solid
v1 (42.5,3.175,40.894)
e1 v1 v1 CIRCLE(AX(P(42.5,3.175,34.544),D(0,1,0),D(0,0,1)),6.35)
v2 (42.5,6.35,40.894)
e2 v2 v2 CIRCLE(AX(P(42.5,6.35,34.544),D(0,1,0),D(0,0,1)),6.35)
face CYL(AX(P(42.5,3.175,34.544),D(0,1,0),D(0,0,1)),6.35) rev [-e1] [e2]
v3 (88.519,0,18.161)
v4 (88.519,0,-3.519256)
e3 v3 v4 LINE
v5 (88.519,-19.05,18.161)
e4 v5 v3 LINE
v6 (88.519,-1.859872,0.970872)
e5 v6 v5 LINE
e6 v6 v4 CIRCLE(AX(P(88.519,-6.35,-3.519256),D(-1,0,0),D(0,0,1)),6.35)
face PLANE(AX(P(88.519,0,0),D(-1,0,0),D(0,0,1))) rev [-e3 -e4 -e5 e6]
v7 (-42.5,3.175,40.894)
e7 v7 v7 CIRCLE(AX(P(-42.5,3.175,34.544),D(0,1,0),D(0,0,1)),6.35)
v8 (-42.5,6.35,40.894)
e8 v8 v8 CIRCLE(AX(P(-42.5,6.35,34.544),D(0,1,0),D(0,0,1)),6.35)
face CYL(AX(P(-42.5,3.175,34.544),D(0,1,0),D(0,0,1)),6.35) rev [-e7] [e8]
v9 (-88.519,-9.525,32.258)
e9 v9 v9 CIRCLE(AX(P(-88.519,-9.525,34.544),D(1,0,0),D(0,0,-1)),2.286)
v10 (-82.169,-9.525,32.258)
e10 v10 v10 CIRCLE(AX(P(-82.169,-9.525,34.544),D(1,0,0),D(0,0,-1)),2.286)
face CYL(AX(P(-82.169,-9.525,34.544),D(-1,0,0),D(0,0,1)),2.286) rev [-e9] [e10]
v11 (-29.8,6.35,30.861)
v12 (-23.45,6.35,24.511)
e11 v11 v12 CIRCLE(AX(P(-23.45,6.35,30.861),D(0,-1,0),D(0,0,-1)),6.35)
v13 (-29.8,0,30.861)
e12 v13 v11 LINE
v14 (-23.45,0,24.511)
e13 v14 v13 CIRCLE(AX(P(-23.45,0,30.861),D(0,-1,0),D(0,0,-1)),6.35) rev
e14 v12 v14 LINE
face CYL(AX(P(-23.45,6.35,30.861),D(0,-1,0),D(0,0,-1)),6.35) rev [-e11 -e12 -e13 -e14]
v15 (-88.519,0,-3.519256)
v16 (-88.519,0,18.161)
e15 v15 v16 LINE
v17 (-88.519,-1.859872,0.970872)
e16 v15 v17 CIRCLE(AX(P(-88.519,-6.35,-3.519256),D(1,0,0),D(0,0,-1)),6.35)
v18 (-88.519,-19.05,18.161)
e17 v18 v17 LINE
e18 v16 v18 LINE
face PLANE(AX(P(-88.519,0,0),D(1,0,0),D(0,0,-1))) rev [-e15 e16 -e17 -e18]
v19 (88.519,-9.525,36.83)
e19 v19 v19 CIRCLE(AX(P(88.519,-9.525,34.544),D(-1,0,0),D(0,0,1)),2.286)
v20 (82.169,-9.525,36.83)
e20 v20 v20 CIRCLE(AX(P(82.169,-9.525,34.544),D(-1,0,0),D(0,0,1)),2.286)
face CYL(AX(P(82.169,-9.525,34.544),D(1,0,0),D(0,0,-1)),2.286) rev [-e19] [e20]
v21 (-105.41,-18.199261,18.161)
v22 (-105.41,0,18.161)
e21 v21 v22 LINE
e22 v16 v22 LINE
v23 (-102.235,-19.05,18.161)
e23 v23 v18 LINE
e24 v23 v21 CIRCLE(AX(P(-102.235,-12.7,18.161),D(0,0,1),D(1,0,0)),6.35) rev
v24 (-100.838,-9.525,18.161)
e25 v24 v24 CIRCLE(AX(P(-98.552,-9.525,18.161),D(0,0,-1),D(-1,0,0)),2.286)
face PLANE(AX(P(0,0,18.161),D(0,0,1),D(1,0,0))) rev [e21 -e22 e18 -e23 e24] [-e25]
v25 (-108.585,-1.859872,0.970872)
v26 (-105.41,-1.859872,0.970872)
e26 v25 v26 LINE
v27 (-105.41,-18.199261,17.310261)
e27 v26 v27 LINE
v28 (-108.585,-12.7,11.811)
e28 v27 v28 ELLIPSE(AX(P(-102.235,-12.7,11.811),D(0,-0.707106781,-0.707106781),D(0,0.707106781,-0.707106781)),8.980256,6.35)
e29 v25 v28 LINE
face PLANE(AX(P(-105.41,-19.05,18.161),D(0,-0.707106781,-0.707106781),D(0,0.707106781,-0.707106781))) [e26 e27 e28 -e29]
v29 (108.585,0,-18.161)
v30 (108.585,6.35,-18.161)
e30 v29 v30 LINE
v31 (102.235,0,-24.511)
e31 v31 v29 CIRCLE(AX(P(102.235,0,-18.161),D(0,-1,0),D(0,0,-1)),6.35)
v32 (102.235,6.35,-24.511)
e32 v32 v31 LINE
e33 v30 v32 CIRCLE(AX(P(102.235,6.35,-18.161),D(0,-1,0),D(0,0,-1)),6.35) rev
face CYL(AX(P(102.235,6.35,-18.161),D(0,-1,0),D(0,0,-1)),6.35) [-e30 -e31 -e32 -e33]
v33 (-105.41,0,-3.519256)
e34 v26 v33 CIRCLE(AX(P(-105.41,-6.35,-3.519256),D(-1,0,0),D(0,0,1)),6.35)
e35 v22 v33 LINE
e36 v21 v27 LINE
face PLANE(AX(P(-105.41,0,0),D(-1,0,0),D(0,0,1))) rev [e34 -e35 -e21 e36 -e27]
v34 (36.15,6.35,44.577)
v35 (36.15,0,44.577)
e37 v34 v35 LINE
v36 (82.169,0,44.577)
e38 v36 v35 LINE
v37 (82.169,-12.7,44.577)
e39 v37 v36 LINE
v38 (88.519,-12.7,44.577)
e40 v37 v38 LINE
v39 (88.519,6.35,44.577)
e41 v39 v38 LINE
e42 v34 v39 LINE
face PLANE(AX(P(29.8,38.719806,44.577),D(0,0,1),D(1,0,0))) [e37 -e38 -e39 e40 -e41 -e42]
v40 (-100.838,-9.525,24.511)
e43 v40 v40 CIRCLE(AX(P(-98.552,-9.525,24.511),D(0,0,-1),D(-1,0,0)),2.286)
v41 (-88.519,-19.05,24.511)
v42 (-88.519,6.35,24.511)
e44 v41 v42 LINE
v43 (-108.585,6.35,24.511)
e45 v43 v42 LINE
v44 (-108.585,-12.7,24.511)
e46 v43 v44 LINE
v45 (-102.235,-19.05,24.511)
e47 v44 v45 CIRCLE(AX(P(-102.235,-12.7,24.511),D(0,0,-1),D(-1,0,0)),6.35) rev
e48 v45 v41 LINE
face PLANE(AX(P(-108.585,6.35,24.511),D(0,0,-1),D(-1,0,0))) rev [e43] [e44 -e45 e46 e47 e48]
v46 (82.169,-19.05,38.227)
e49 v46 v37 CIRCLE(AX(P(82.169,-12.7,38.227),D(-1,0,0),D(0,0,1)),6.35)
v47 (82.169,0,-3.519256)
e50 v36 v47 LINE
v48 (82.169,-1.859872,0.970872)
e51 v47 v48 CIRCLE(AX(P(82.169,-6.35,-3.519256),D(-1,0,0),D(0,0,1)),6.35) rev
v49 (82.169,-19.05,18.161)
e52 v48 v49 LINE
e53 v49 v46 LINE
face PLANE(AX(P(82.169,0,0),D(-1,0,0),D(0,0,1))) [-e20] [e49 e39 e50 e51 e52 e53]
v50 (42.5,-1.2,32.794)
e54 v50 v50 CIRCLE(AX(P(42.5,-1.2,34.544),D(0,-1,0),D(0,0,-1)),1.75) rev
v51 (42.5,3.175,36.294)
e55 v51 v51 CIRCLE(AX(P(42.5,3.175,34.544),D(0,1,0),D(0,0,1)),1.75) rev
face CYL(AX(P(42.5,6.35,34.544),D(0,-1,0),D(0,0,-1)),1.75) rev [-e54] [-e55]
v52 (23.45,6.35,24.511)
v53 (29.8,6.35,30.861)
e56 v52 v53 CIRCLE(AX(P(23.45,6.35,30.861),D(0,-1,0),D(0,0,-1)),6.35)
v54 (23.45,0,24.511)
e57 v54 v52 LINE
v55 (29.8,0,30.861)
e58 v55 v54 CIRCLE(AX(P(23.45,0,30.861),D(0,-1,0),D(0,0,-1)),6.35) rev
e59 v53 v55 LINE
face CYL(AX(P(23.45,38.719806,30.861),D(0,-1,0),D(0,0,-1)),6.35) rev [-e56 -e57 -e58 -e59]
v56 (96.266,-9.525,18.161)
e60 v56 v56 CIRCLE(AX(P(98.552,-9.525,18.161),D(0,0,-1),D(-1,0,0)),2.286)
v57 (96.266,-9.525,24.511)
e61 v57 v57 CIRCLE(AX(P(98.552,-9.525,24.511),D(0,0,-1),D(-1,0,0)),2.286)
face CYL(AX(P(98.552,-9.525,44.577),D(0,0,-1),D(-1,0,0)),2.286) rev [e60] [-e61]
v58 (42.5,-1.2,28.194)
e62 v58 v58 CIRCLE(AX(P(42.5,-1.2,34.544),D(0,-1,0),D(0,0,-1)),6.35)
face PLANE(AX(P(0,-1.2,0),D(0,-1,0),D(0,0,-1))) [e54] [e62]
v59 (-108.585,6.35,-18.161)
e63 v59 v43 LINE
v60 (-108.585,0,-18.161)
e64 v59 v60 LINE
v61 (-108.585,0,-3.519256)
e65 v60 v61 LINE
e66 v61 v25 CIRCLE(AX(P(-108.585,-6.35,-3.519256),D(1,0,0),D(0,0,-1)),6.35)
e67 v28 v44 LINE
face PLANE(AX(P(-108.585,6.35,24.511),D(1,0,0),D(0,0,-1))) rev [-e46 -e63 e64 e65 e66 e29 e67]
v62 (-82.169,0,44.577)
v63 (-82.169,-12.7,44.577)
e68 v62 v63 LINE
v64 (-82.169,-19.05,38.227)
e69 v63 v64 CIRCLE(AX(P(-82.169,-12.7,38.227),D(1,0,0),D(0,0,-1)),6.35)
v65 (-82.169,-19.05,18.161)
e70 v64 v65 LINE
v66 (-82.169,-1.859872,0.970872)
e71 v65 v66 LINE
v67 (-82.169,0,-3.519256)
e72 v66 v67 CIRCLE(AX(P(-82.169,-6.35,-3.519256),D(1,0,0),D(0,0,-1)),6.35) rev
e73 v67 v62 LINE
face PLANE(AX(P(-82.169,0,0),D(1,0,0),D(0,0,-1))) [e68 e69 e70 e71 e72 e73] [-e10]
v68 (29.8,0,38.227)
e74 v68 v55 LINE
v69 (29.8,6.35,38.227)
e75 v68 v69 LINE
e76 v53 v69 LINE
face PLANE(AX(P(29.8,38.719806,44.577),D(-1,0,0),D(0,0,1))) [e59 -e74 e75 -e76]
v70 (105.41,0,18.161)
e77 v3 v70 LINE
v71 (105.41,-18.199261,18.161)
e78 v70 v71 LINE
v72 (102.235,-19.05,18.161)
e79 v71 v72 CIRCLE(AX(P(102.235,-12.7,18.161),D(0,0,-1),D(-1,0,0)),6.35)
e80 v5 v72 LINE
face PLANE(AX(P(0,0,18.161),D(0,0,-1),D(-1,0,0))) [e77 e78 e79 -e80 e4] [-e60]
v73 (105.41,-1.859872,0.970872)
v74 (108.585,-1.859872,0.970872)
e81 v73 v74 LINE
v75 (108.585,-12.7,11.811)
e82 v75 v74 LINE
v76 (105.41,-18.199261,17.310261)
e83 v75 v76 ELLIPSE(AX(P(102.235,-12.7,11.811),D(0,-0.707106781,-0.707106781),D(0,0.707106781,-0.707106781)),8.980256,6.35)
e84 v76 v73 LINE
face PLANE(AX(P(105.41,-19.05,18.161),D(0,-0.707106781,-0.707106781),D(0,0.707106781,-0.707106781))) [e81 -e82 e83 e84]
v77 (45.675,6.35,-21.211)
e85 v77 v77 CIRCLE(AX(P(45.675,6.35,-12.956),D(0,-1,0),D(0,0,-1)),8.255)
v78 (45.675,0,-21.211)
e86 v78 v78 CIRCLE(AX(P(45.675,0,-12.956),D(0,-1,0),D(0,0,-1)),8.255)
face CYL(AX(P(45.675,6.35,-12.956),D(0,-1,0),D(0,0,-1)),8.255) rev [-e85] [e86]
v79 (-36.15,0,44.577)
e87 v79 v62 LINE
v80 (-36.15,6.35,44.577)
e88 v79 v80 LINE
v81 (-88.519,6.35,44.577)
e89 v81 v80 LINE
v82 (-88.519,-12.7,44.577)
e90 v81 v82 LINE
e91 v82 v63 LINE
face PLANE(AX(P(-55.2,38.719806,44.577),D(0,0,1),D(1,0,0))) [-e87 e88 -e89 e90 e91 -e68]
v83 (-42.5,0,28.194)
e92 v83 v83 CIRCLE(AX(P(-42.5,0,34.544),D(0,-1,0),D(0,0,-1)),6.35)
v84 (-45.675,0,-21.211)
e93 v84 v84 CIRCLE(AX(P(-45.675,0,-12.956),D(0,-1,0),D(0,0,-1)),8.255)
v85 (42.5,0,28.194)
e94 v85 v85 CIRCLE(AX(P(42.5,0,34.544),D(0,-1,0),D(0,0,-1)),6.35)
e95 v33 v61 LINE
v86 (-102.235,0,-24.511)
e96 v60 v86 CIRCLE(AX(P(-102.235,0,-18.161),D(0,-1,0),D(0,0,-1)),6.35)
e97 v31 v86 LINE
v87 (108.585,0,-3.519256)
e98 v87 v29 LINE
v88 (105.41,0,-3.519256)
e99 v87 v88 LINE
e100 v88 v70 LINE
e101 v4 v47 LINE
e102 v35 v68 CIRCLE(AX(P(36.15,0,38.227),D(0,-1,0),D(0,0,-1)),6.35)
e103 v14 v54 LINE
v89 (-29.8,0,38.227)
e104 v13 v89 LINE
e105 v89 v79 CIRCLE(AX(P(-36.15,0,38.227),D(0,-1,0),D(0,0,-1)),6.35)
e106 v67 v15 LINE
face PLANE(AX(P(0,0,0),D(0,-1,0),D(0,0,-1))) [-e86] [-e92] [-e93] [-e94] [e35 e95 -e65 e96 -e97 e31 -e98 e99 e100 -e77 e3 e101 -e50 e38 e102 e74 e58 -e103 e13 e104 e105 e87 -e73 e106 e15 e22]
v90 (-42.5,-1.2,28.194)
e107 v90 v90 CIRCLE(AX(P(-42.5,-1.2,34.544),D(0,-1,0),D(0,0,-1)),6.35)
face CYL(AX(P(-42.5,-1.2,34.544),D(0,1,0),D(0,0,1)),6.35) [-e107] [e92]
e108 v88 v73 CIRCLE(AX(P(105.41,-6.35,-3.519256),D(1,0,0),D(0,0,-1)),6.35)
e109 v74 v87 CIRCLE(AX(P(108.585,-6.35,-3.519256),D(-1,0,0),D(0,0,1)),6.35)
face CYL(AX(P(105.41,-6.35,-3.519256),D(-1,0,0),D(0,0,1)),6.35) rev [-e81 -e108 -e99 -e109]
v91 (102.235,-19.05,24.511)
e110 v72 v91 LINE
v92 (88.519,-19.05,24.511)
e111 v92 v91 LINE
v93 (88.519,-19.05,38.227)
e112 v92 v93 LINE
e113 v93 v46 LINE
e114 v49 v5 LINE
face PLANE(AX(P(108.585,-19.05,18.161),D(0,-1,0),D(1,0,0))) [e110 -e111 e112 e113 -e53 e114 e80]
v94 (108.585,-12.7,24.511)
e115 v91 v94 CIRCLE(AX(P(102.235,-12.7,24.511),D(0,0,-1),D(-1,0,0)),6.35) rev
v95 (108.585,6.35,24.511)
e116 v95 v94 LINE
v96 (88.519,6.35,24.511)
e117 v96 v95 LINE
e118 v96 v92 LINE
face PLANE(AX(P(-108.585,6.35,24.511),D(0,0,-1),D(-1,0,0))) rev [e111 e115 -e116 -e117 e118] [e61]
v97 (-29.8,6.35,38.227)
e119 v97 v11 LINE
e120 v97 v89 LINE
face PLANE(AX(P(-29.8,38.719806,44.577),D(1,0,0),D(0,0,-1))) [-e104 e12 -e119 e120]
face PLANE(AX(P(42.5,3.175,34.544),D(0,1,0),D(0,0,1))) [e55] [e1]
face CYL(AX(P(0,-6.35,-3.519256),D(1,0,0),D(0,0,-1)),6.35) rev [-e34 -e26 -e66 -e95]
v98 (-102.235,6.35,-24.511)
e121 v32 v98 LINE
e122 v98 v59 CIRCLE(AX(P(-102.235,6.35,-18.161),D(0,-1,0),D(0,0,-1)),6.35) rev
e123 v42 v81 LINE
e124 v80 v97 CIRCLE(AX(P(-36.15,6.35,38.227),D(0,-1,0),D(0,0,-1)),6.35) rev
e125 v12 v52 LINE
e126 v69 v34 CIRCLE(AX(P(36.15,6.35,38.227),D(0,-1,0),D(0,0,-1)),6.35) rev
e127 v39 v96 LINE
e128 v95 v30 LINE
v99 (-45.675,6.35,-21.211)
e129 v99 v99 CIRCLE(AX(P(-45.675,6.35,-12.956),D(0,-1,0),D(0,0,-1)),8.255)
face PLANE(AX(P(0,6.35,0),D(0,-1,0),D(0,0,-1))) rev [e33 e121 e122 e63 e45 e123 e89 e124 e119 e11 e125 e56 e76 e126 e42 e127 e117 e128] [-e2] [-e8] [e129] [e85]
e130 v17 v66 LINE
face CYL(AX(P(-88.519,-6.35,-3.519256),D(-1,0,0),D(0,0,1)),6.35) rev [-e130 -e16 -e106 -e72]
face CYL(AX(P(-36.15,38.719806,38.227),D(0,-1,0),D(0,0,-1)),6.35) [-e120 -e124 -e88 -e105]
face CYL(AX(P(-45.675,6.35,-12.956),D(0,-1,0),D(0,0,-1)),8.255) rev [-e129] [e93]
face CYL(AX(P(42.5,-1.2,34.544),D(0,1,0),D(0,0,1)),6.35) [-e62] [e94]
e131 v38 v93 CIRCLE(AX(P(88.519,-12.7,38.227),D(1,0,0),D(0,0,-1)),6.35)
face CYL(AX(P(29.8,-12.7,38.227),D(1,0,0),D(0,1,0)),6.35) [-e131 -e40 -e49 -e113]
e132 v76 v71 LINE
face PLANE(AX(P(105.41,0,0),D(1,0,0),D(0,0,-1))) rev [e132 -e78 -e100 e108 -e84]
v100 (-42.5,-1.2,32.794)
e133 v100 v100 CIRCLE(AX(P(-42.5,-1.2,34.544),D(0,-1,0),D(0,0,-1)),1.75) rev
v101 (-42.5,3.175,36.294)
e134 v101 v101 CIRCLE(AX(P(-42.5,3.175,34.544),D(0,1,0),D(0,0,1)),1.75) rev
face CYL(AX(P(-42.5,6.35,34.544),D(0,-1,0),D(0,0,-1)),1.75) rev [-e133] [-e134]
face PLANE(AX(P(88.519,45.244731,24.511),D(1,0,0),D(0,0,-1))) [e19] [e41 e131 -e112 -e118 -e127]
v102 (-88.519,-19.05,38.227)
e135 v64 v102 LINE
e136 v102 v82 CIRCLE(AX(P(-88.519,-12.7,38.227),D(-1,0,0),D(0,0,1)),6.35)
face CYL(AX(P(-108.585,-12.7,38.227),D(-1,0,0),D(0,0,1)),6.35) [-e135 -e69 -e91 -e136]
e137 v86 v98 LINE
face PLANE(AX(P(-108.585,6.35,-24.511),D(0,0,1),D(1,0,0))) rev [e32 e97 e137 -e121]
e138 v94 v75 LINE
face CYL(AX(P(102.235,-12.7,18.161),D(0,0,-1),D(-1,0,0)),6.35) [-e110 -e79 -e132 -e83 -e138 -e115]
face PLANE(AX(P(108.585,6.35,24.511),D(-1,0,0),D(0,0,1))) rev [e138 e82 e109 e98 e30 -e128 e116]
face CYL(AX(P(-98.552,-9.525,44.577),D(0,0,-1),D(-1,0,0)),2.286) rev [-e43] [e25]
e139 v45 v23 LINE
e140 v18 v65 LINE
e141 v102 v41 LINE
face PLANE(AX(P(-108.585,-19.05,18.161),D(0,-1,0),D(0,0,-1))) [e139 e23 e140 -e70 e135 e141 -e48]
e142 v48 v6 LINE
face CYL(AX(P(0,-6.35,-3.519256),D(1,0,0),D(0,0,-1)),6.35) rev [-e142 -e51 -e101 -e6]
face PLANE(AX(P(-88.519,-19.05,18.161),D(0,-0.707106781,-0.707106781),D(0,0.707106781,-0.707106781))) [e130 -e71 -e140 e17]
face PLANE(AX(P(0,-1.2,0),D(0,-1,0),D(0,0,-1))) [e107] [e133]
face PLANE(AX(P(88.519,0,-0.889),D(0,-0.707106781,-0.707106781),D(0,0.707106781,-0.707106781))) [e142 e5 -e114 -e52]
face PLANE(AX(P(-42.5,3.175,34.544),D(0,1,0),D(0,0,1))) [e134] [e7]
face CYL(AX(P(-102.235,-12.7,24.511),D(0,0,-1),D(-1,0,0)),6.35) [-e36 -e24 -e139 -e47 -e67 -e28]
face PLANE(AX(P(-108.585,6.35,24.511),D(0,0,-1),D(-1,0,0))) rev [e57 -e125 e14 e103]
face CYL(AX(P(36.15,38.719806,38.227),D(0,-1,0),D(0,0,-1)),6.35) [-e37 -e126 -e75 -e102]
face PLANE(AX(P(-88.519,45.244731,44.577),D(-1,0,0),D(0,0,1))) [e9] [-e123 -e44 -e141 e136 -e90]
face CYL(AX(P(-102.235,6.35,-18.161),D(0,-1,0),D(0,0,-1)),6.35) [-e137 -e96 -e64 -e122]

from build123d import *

# Parameters (mm, degrees)
SKETCH1_W            = 217.17
SKETCH1_H            = 49.022
BOSS_EXTRUDE1_DEPTH  = 6.35
SKETCH5_W            = 20.066
SKETCH5_H            = 25.4
BOSS_EXTRUDE3_DEPTH  = 6.35
SKETCH6_W            = 25.4
SKETCH6_H            = 20.066
BOSS_EXTRUDE4_DEPTH  = 6.35
SKETCH7_R            = 1.75
CUT_EXTRUDE1_DEPTH   = 119.914732704
SKETCH9_R            = 2.286
CUT_EXTRUDE2_DEPTH   = 119.213807607
BOSS_EXTRUDE8_DEPTH  = 3.175
BOSS_EXTRUDE9_START  = 1.2
SKETCH15_R           = 6.35
SKETCH15_R_2         = 1.75
BOSS_EXTRUDE9_DEPTH  = 1.2
CUT_EXTRUDE4_START   = -3.175
SKETCH16_R           = 6.35
CUT_EXTRUDE4_DEPTH   = 3.175
SKETCH17_R           = 8.255
CUT_EXTRUDE5_DEPTH   = 119.914732704
SKETCH18_W           = 33.319
SKETCH18_H           = 20.066
BOSS_EXTRUDE10_DEPTH = 6.35
SKETCH19_R           = 2.286
BOSS_EXTRUDE11_DEPTH = 6.35
BOSS_EXTRUDE12_START = 6.35
SKETCH20_W           = 26.416
SKETCH20_H           = 19.05
SKETCH20_R           = 2.286
BOSS_EXTRUDE12_DEPTH = 6.35
BOSS_EXTRUDE13_DEPTH = 3.175
BOSS_EXTRUDE14_DEPTH = 3.175
BOSS_EXTRUDE15_DEPTH = 6.35
BOSS_EXTRUDE16_DEPTH = 6.35
FILLET2_R            = 6.35
FILLET3_R            = 6.35


with BuildPart() as part:
    # Sketch1 → Boss-Extrude1 (new body)
    with BuildSketch(Plane(origin=(0, 0, 0), x_dir=(1, 0, 0), z_dir=(0, 1, 0))):
        Rectangle(SKETCH1_W, SKETCH1_H)
    extrude(amount=BOSS_EXTRUDE1_DEPTH)

    # Sketch5 → Boss-Extrude3 (add)
    with BuildSketch(Plane.XY.offset(24.511)):
        with Locations((-98.552, -6.35)):
            Rectangle(SKETCH5_W, SKETCH5_H)
        with Locations((98.552, -6.35)):
            Rectangle(SKETCH5_W, SKETCH5_H)
    extrude(amount=-BOSS_EXTRUDE3_DEPTH)

    # Sketch6 → Boss-Extrude4 (add)
    with BuildSketch(Plane(origin=(0, 0, 0), x_dir=(-1, 0, 0), z_dir=(0, -1, 0))):
        with Locations((42.5, -34.544)):
            Rectangle(SKETCH6_W, SKETCH6_H)
        with Locations((-42.5, -34.544)):
            Rectangle(SKETCH6_W, SKETCH6_H)
    extrude(amount=-BOSS_EXTRUDE4_DEPTH)

    # Sketch7 → Cut-Extrude1 (cut, through all)
    with BuildSketch(Plane.XZ):
        with Locations(Location((-42.5, 34.544, 0), (0, 0, 270))):
            Circle(SKETCH7_R)
        with Locations(Location((42.5, 34.544, 0), (0, 0, 270))):
            Circle(SKETCH7_R)
    extrude(amount=-CUT_EXTRUDE1_DEPTH, mode=Mode.SUBTRACT)

    # Sketch9 → Cut-Extrude2 (cut, through all)
    with BuildSketch(Plane(origin=(0, 0, 18.161), x_dir=(-1, 0, 0), z_dir=(0, 0, -1))):
        with Locations((98.552, -9.525)):
            Circle(SKETCH9_R)
        with Locations((-98.552, -9.525)):
            Circle(SKETCH9_R)
    extrude(amount=-CUT_EXTRUDE2_DEPTH, mode=Mode.SUBTRACT)

    # Sketch14 → Boss-Extrude8 (add)
    with BuildSketch(Plane.ZY.offset(108.585)):
        Polygon((-24.511, 6.35), (-24.511, 0), (18.161, 0), (18.161, -19.05), (24.511, -19.05), (24.511, 6.35), align=None)
    extrude(amount=-BOSS_EXTRUDE8_DEPTH)

    # Sketch15 → Boss-Extrude9 (add)
    # profile 1 of 2: a face of its own
    with BuildSketch(Plane.XZ.offset(BOSS_EXTRUDE9_START)):
        with Locations(Location((42.5, 34.544, 0), (0, 0, 270))):
            Circle(SKETCH15_R)
        with Locations(Location((42.5, 34.544, 0), (0, 0, 270))):
            Circle(SKETCH15_R_2, mode=Mode.SUBTRACT)
    # profile 2 of 2: a face of its own
    with BuildSketch(Plane.XZ.offset(BOSS_EXTRUDE9_START)):
        with Locations(Location((-42.5, 34.544, 0), (0, 0, 270))):
            Circle(SKETCH15_R)
        with Locations(Location((-42.5, 34.544, 0), (0, 0, 270))):
            Circle(SKETCH15_R_2, mode=Mode.SUBTRACT)
    extrude(amount=-BOSS_EXTRUDE9_DEPTH)

    # Sketch16 → Cut-Extrude4 (cut)
    with BuildSketch(Plane(origin=(0, 6.35, 0), x_dir=(1, 0, 0), z_dir=(0, 1, 0)).offset(CUT_EXTRUDE4_START)):
        with Locations(Location((42.5, -34.544, 0), (0, 0, 90))):
            Circle(SKETCH16_R)
        with Locations(Location((-42.5, -34.544, 0), (0, 0, 90))):
            Circle(SKETCH16_R)
    extrude(amount=CUT_EXTRUDE4_DEPTH, mode=Mode.SUBTRACT)

    # Sketch17 → Cut-Extrude5 (cut, through all)
    with BuildSketch(Plane.XZ):
        with Locations(Location((-45.675, -12.956, 0), (0, 0, 270))):
            Circle(SKETCH17_R)
        with Locations(Location((45.675, -12.956, 0), (0, 0, 270))):
            Circle(SKETCH17_R)
    extrude(amount=-CUT_EXTRUDE5_DEPTH, mode=Mode.SUBTRACT)

    # Sketch18 → Boss-Extrude10 (add)
    with BuildSketch(Plane.XZ):
        with Locations((71.8595, 34.544)):
            Rectangle(SKETCH18_W, SKETCH18_H)
        with Locations((-71.8595, 34.544)):
            Rectangle(SKETCH18_W, SKETCH18_H)
    extrude(amount=-BOSS_EXTRUDE10_DEPTH)

    # Sketch19 → Boss-Extrude11 (add)
    with BuildSketch(Plane.ZY.offset(-88.519)):
        Polygon((24.511, -19.05), (44.577, -19.05), (44.577, 0), (24.511, 0), (18.161, 0), (18.161, -19.05), align=None)
        with Locations((34.544, -9.525)):
            Circle(SKETCH19_R, mode=Mode.SUBTRACT)
    extrude(amount=BOSS_EXTRUDE11_DEPTH)

    # Sketch20 → Boss-Extrude12 (add)
    with BuildSketch(Plane(origin=(-88.519, 0, 0), x_dir=(0, 0, -1), z_dir=(1, 0, 0)).offset(BOSS_EXTRUDE12_START)):
        with Locations((-31.369, -9.525)):
            Rectangle(SKETCH20_W, SKETCH20_H)
        with Locations(Location((-34.544, -9.525, 0), (0, 0, 180))):
            Circle(SKETCH20_R, mode=Mode.SUBTRACT)
    extrude(amount=-BOSS_EXTRUDE12_DEPTH)

    # Sketch21 → Boss-Extrude13 (add)
    with BuildSketch(Plane.ZY.offset(108.585)):
        Polygon((18.161, -19.05), (-0.889, 0), (18.161, 0), align=None)
    extrude(amount=-BOSS_EXTRUDE13_DEPTH)

    # Sketch22 → Boss-Extrude14 (add)
    with BuildSketch(Plane(origin=(108.585, 0, 0), x_dir=(0, 0, -1), z_dir=(1, 0, 0))):
        Polygon((-18.161, 0), (-18.161, -19.05), (0.889, 0), align=None)
    extrude(amount=-BOSS_EXTRUDE14_DEPTH)

    # Sketch23 → Boss-Extrude15 (add)
    with BuildSketch(Plane(origin=(-82.169, 0, 0), x_dir=(0, 0, -1), z_dir=(1, 0, 0))):
        Polygon((-18.161, 0), (-18.161, -19.05), (0.889, 0), align=None)
    extrude(amount=-BOSS_EXTRUDE15_DEPTH)

    # Sketch24 → Boss-Extrude16 (add)
    with BuildSketch(Plane.ZY.offset(-82.169)):
        Polygon((18.161, 0), (-0.889, 0), (18.161, -19.05), align=None)
    extrude(amount=-BOSS_EXTRUDE16_DEPTH)

    # Fillet2
    fillet2_edges = [part.edges().sort_by_distance(p)[0] for p in [
        (85.344, -19.05, 44.577),
        (-85.344, -19.05, 44.577),
        (-29.8, 3.175, 44.577),
        (-29.8, 3.175, 24.511),
        (29.8, 3.175, 24.511),
        (29.8, 3.175, 44.577),
    ]]
    fillet(fillet2_edges, radius=FILLET2_R)

    # Fillet3
    # the kernel refuses this fillet: 6.35 mm, written as the material it adds along each edge
    with BuildSketch(Plane(origin=(-108.585, 0, -0.889), x_dir=(0, 0, -1), z_dir=(1, 0, 0))) as fillet3_piece_1:
        with BuildLine():
            CenterArc((FILLET3_R * 0.414213562373, -FILLET3_R), FILLET3_R, 90, 45)
            Line((-FILLET3_R * 0.292893218813, -FILLET3_R * 0.292893218813), (0, 0))
            Line((0, 0), (FILLET3_R * 0.414213562373, 0))
        make_face()
    extrude(amount=3.175)
    with BuildSketch(Plane(origin=(108.585, 0, -0.889), x_dir=(0, 0, -1), z_dir=(-1, 0, 0))) as fillet3_piece_2:
        with BuildLine():
            CenterArc((FILLET3_R * 0.414213562373, FILLET3_R), FILLET3_R, 225, 45)
            Line((-FILLET3_R * 0.292893218813, FILLET3_R * 0.292893218813), (0, 0))
            Line((0, 0), (FILLET3_R * 0.414213562373, 0))
        make_face()
    extrude(amount=3.175)
    with BuildSketch(Plane(origin=(-82.169, 0, -0.889), x_dir=(0, 0, -1), z_dir=(-1, 0, 0))) as fillet3_piece_3:
        with BuildLine():
            CenterArc((FILLET3_R * 0.414213562373, FILLET3_R), FILLET3_R, 225, 45)
            Line((-FILLET3_R * 0.292893218813, FILLET3_R * 0.292893218813), (0, 0))
            Line((0, 0), (FILLET3_R * 0.414213562373, 0))
        make_face()
    extrude(amount=6.35)
    with BuildSketch(Plane(origin=(82.169, 0, -0.889), x_dir=(0, 0, -1), z_dir=(1, 0, 0))) as fillet3_piece_4:
        with BuildLine():
            CenterArc((FILLET3_R * 0.414213562373, -FILLET3_R), FILLET3_R, 90, 45)
            Line((-FILLET3_R * 0.292893218813, -FILLET3_R * 0.292893218813), (0, 0))
            Line((0, 0), (FILLET3_R * 0.414213562373, 0))
        make_face()
    extrude(amount=6.35)
    # the kernel refuses this fillet: 6.35 mm, written as the material it takes off along each edge
    with BuildSketch(Plane(origin=(-108.585, -19.05, 40.386), x_dir=(1, 0, 0), z_dir=(0, 0, -1))) as fillet3_2_piece_1:
        with BuildLine():
            CenterArc((FILLET3_R, -FILLET3_R), FILLET3_R, 90, 90)
            Line((0, -FILLET3_R), (0, 0))
            Line((0, 0), (FILLET3_R, 0))
        make_face()
    extrude(amount=38.1, mode=Mode.SUBTRACT)
    with BuildSketch(Plane(origin=(108.585, -19.05, 40.386), x_dir=(-1, 0, 0), z_dir=(0, 0, -1)), Plane(origin=(-108.585, -15.875, -24.511), x_dir=(0, 0, 1), z_dir=(0, 1, 0)), Plane(origin=(108.585, -15.875, -24.511), x_dir=(-1, 0, 0), z_dir=(0, 1, 0))) as fillet3_2_piece_2:
        with BuildLine():
            CenterArc((FILLET3_R, FILLET3_R), FILLET3_R, 180, 90)
            Line((0, FILLET3_R), (0, 0))
            Line((0, 0), (FILLET3_R, 0))
        make_face()
    extrude(amount=38.1, mode=Mode.SUBTRACT)


solid = part.part
